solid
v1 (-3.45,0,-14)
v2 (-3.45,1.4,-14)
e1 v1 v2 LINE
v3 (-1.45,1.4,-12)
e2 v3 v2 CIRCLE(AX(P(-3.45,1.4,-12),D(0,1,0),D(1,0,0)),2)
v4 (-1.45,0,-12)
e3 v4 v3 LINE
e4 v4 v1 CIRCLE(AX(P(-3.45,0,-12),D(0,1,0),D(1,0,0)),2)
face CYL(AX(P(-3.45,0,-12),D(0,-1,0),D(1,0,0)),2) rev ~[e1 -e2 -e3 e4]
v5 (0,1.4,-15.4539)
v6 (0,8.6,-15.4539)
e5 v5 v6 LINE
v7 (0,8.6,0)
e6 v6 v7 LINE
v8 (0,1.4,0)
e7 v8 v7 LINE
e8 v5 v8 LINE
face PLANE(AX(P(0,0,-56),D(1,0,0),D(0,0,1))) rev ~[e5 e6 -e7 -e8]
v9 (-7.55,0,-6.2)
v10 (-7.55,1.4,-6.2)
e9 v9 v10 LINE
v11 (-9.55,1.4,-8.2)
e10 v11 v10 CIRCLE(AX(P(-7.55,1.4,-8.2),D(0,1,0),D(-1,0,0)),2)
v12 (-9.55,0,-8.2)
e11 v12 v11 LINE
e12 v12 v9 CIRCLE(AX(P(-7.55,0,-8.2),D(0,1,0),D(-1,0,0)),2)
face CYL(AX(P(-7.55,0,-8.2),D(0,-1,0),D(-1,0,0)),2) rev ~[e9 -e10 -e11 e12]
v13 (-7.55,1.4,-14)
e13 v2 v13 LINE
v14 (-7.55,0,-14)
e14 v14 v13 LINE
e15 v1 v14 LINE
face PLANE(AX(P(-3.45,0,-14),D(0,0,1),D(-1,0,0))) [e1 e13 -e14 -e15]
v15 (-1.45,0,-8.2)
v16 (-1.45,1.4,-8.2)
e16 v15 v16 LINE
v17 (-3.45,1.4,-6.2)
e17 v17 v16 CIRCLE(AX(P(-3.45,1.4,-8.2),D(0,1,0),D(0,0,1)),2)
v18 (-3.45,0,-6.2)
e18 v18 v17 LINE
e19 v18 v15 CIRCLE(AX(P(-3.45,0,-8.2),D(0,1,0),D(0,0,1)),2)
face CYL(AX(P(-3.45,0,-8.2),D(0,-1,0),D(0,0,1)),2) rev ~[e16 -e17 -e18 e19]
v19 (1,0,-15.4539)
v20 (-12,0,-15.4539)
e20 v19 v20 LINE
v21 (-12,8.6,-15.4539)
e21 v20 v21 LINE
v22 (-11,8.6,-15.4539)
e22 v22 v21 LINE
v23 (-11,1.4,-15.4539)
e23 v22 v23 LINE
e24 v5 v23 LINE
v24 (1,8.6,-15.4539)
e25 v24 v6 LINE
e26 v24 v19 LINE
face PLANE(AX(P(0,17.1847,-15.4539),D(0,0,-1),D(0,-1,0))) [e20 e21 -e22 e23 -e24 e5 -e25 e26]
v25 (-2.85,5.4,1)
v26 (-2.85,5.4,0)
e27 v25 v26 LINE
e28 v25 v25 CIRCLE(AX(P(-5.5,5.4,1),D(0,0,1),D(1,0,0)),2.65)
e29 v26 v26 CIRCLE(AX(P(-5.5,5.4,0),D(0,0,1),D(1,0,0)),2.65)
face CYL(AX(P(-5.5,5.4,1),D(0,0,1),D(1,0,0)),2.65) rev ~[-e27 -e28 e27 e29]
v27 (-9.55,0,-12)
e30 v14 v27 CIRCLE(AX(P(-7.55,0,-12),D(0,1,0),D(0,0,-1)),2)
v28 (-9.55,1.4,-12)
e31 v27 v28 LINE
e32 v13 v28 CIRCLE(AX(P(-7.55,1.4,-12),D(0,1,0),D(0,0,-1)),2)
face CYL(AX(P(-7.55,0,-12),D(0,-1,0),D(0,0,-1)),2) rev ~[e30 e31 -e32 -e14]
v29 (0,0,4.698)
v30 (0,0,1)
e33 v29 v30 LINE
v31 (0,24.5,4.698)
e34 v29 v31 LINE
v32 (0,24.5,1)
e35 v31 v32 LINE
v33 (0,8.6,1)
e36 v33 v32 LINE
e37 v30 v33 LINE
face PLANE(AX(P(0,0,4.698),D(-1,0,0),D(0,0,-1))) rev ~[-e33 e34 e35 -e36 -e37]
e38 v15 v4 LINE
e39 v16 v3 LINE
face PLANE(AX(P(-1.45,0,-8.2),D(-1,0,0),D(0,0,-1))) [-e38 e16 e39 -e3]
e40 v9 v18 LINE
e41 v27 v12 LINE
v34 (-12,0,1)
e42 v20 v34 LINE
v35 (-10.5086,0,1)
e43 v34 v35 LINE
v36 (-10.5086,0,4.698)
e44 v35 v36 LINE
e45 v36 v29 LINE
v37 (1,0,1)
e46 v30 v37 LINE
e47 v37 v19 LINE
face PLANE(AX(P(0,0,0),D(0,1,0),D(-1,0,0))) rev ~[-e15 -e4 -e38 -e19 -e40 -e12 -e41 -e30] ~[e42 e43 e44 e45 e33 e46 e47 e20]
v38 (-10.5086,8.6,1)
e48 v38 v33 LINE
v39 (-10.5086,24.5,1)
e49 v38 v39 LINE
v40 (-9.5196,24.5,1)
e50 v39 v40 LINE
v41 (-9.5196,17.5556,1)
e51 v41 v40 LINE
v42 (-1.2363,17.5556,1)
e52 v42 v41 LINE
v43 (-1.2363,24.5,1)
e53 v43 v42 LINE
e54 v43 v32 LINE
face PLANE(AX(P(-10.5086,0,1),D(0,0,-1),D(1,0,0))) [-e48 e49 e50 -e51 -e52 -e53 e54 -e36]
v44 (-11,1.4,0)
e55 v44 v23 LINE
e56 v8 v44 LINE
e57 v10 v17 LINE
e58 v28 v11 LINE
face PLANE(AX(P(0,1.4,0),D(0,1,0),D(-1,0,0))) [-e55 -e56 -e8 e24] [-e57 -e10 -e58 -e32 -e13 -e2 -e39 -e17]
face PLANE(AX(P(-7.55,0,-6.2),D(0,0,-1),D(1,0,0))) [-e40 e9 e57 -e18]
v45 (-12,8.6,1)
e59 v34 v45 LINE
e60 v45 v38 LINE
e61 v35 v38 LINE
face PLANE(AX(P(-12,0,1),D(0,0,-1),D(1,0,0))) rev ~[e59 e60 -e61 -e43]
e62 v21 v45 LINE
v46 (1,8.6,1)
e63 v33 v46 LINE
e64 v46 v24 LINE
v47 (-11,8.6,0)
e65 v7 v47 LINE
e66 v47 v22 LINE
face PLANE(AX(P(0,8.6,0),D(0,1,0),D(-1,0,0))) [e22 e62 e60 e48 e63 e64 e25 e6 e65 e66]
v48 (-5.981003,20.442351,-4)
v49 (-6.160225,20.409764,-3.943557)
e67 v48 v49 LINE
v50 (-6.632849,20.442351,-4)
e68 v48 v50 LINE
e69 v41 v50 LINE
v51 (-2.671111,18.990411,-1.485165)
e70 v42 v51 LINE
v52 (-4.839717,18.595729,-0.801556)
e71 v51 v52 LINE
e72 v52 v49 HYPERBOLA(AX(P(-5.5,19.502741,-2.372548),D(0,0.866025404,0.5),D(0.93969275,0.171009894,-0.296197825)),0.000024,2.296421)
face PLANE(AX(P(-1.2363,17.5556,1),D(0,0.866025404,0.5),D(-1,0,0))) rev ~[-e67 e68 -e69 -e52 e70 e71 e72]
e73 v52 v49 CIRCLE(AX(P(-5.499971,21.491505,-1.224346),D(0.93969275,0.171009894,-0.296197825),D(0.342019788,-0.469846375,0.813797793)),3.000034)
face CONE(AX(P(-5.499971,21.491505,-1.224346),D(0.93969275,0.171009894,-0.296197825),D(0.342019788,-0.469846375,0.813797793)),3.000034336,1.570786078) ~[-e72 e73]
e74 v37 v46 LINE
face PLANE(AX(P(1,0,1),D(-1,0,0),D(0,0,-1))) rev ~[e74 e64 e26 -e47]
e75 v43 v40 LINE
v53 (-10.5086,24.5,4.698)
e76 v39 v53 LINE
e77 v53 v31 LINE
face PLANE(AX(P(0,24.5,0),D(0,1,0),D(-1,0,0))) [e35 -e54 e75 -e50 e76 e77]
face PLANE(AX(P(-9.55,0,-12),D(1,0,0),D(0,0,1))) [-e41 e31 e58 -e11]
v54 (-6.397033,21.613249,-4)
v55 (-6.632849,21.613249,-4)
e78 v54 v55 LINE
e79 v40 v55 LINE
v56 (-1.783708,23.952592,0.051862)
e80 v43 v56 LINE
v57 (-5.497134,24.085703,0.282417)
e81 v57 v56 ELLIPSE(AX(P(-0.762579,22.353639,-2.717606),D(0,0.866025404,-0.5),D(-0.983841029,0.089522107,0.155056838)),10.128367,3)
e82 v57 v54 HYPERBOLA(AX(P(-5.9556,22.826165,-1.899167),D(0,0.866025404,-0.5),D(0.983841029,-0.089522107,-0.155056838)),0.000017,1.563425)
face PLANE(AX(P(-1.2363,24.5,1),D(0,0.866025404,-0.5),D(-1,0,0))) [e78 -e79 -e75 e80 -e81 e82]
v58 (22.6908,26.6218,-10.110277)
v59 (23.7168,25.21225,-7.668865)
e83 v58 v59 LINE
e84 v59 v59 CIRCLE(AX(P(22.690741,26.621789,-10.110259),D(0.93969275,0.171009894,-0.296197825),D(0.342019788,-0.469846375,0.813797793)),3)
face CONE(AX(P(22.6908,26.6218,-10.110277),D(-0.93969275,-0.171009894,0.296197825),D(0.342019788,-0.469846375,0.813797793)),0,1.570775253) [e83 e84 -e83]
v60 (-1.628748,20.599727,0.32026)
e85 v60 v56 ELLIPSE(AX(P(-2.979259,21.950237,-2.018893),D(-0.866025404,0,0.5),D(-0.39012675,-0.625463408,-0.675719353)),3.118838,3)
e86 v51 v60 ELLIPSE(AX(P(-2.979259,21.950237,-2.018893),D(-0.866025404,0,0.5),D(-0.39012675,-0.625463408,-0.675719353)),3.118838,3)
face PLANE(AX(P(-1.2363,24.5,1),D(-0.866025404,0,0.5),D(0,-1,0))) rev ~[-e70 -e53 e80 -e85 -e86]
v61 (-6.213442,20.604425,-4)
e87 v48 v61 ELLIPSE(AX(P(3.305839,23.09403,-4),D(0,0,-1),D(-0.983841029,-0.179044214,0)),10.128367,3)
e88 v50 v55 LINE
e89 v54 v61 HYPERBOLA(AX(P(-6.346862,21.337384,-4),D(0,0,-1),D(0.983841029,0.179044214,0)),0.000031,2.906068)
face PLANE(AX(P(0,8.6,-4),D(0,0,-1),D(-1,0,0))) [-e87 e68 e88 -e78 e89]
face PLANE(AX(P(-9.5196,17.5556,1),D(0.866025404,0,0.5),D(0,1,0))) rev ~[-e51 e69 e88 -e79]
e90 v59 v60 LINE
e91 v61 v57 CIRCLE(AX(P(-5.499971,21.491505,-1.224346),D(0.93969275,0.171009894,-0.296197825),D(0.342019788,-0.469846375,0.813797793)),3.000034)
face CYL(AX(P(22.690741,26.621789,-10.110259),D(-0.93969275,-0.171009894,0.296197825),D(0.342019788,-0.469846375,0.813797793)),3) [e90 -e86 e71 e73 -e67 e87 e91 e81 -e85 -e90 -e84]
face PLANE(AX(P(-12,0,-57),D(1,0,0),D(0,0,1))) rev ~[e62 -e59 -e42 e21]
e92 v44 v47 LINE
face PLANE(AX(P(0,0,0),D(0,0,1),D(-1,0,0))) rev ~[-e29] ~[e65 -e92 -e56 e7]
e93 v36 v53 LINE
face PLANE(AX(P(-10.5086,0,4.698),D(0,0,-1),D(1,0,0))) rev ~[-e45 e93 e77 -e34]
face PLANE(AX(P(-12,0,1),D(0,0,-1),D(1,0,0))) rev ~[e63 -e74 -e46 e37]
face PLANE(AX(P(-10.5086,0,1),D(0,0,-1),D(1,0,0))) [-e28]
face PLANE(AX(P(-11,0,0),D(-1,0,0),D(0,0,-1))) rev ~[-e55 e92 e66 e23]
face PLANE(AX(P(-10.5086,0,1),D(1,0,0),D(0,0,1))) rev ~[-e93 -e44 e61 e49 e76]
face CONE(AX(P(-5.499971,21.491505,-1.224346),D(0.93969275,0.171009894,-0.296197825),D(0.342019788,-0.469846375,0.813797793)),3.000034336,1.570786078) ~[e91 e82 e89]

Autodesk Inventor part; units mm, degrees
ref_plane "YZ Plane" through (0, 0, 0) normal (1, 0, 0) x (0, 1, 0)
ref_plane "XZ Plane" through (0, 0, 0) normal (0, 1, 0) x (-1, 0, 0)
ref_plane "XY Plane" through (0, 0, 0) normal (0, 0, 1) x (1, 0, 0)
sketch "Sketch3" plane through (0, 0, 0) normal (0, 1, 0) x (-1, 0, 0)
  line L0 (0, 0) -> (11, 0)
  line L1 (11, 0) -> (11, -56)
  line L2 (11, -56) -> (0, -56)
  line L3 (0, -56) -> (0, 0)
  line L4 (12, 1) -> (-1, 1)
  line L5 (-1, 1) -> (-1, -57)
  line L6 (-1, -57) -> (12, -57)
  line L7 (12, -57) -> (12, 1)
  line L8 (7.55, -6.2) -> (3.45, -6.2)
  line L9 (1.45, -8.2) -> (1.45, -12)
  line L10 (3.45, -14) -> (7.55, -14)
  line L11 (9.55, -12) -> (9.55, -8.2)
  arc A0 (9.55, -8.2) -> (7.55, -6.2) centre (7.55, -8.2) ccw
  arc A1 (7.55, -14) -> (9.55, -12) centre (7.55, -12) ccw
  arc A2 (1.45, -12) -> (3.45, -14) centre (3.45, -12) ccw
  arc A3 (3.45, -6.2) -> (1.45, -8.2) centre (3.45, -8.2) ccw
  circle A4 centre (5.5, -51) radius 1
  point P0 (1.45, -14)
  point P1 (1.45, -6.2)
  point P2 (9.55, -14)
  dimension "d2" = 11
  dimension "d3" = 56
  dimension "d4" = 1
  dimension "d5" = 1
  dimension "d6" = 1
  dimension "d7" = 1
  dimension "d8" = 8.1
  dimension "d9" = 7.8
  dimension "d10" = 14
  dimension "d11" = 9.55
  dimension "d12" = 2
  dimension "d30" = 2
  dimension "d31" = 5
  dimension "d32" = 5.5
extrude "Extrusion1" add sketch "Sketch3" along normal blind 1.4 contours L0 L1 L2 L3
extrude "Extrusion3" add sketch "Sketch3" along normal blind 8.6 contours L7 L6 L5 L4
sketch "Sketch4" plane through (-12, 0, 1) normal (0, 0, 1) x (1, 0, 0)
  circle A0 centre (6.5, 5.4) radius 2.65
  line L0 (0, 0) -> (0, 8.6) projected
  line L1 (0, 0) -> (13, 0) projected
  point P0 (12, 0)
  dimension "d19" = 6.5
  dimension "d20" = 5.3
  dimension "d21" = 5.4
extrude "Extrusion4" cut sketch "Sketch4" against normal blind 8.6
sketch "Sketch5" plane through (1, 0, -57) normal (0, 0, -1) x (-1, 0, 0)
  line L0 (2.675, 6.25) -> (10.325, 6.25)
  line L1 (10.325, 6.25) -> (10.325, 3.55)
  line L2 (10.325, 3.55) -> (2.675, 3.55)
  line L3 (2.675, 3.55) -> (2.675, 6.25)
  line L4 (0, 0) -> (13, 0) projected
  line L5 (13, 0) -> (13, 8.6) projected
  point P0 (1, 0)
  dimension "d24" = 7.65
  dimension "d25" = 2.7
  dimension "d26" = 3.55
  dimension "d27" = 2.675
extrude "Extrusion5" cut sketch "Sketch5" against normal blind 8.6
sketch "Sketch6" plane through (0, 0, 0) normal (0, 1, 0) x (-1, 0, 0)
  line L0 (46.885, 6) -> (-33.7151, 6)
  line L1 (12, 1) -> (-1, 1) projected
  point P0 (0, 0)
  dimension "d33" = 5
ref_plane "Work Plane1" through (-46.885, 0, 6) normal (0, -0.8660254, -0.5) x (1, 0, 0)
ref_plane "Work Plane2" through (-46.885, 12.9904, 13.5) normal (0, -0.8660254, -0.5) x (1, 0, 0)
sketch "Sketch8" plane through (-46.885, 12.9904, 13.5) normal (0, -0.8660254, -0.5) x (1, 0, 0)
  line L0 (41.385, -17.0022) -> (69.5758, -27.2628)
  line L1 (47.885, -8.6301) -> (47.885, -58.8596) projected
  line L2 (34.885, -4.3301) -> (47.885, -4.3301) projected
  line L3 (46.885, -57.9936) -> (46.885, -9.4962) projected
  line L4 (69.5758, -27.2628) -> (70.6018, -24.4437)
  line L5 (70.6018, -24.4437) -> (42.4111, -14.1831)
  line L6 (42.4111, -14.1831) -> (41.385, -17.0022)
  point P0 (46.885, -5.1962)
  dimension "d42" = 70
  dimension "d44" = 5.5
  dimension "d45" = 30
  dimension "d46" = 3
revolve "Revolution1" add sketch "Sketch8" angle 360 about axis through (-5.5, 21.4915, -1.2243) along (0.9396926, 0.1710101, -0.2961981)
sketch "Sketch9" plane through (0, 0, 0) normal (0, 1, 0) x (-1, 0, 0)
  line L0 (12, 1) -> (-1, 1) projected
  line L1 (0, 1) -> (10.5086, 1)
  line L2 (10.5086, 1) -> (10.5086, 4.698)
  line L3 (10.5086, 4.698) -> (0, 4.698)
  line L4 (0, 4.698) -> (0, 1)
  point P0 (0, 0)
extrude "Extrusion6" add sketch "Sketch9" along normal blind 24.5
sketch "Sketch10" plane through (0, 8.6, 1) normal (0, 0, -1) x (-1, 0, 0)
  line L0 (0, 15.9) -> (10.5086, 15.9) projected
  line L1 (9.5196, 15.9) -> (1.2363, 15.9)
  line L2 (1.2363, 15.9) -> (1.2363, 8.9556)
  line L3 (1.2363, 8.9556) -> (9.5196, 8.9556)
  line L4 (9.5196, 8.9556) -> (9.5196, 15.9)
  point P0 (0, -8.6)
extrude "Extrusion7" add sketch "Sketch10" along normal blind 5 draft -30
sketch "Sketch11" plane through (0, 0, 0) normal (1, 0, 0) x (0, 1, 0)
  line L0 (17.1847, -15.4539) -> (-9.2723, -15.4539)
  line L1 (-9.2723, -15.4539) -> (-9.2723, -62.4336)
  line L2 (-9.2723, -62.4336) -> (17.1847, -62.4336)
  line L3 (17.1847, -62.4336) -> (17.1847, -15.4539)
  point P0 (0, 0)
extrude "Extrusion8" cut sketch "Sketch11" along normal through all both and the other way through all
equation "\"d11\" = 0.5 * d2 + 0.5 * d8"
equation "\"d32\" = 0.5 * d2"
equation "\"d19\" = 0.5 * d2 + d4"
equation "\"d44\" = 0.5 * d2"
properties part number "QC25BTFication_2"
